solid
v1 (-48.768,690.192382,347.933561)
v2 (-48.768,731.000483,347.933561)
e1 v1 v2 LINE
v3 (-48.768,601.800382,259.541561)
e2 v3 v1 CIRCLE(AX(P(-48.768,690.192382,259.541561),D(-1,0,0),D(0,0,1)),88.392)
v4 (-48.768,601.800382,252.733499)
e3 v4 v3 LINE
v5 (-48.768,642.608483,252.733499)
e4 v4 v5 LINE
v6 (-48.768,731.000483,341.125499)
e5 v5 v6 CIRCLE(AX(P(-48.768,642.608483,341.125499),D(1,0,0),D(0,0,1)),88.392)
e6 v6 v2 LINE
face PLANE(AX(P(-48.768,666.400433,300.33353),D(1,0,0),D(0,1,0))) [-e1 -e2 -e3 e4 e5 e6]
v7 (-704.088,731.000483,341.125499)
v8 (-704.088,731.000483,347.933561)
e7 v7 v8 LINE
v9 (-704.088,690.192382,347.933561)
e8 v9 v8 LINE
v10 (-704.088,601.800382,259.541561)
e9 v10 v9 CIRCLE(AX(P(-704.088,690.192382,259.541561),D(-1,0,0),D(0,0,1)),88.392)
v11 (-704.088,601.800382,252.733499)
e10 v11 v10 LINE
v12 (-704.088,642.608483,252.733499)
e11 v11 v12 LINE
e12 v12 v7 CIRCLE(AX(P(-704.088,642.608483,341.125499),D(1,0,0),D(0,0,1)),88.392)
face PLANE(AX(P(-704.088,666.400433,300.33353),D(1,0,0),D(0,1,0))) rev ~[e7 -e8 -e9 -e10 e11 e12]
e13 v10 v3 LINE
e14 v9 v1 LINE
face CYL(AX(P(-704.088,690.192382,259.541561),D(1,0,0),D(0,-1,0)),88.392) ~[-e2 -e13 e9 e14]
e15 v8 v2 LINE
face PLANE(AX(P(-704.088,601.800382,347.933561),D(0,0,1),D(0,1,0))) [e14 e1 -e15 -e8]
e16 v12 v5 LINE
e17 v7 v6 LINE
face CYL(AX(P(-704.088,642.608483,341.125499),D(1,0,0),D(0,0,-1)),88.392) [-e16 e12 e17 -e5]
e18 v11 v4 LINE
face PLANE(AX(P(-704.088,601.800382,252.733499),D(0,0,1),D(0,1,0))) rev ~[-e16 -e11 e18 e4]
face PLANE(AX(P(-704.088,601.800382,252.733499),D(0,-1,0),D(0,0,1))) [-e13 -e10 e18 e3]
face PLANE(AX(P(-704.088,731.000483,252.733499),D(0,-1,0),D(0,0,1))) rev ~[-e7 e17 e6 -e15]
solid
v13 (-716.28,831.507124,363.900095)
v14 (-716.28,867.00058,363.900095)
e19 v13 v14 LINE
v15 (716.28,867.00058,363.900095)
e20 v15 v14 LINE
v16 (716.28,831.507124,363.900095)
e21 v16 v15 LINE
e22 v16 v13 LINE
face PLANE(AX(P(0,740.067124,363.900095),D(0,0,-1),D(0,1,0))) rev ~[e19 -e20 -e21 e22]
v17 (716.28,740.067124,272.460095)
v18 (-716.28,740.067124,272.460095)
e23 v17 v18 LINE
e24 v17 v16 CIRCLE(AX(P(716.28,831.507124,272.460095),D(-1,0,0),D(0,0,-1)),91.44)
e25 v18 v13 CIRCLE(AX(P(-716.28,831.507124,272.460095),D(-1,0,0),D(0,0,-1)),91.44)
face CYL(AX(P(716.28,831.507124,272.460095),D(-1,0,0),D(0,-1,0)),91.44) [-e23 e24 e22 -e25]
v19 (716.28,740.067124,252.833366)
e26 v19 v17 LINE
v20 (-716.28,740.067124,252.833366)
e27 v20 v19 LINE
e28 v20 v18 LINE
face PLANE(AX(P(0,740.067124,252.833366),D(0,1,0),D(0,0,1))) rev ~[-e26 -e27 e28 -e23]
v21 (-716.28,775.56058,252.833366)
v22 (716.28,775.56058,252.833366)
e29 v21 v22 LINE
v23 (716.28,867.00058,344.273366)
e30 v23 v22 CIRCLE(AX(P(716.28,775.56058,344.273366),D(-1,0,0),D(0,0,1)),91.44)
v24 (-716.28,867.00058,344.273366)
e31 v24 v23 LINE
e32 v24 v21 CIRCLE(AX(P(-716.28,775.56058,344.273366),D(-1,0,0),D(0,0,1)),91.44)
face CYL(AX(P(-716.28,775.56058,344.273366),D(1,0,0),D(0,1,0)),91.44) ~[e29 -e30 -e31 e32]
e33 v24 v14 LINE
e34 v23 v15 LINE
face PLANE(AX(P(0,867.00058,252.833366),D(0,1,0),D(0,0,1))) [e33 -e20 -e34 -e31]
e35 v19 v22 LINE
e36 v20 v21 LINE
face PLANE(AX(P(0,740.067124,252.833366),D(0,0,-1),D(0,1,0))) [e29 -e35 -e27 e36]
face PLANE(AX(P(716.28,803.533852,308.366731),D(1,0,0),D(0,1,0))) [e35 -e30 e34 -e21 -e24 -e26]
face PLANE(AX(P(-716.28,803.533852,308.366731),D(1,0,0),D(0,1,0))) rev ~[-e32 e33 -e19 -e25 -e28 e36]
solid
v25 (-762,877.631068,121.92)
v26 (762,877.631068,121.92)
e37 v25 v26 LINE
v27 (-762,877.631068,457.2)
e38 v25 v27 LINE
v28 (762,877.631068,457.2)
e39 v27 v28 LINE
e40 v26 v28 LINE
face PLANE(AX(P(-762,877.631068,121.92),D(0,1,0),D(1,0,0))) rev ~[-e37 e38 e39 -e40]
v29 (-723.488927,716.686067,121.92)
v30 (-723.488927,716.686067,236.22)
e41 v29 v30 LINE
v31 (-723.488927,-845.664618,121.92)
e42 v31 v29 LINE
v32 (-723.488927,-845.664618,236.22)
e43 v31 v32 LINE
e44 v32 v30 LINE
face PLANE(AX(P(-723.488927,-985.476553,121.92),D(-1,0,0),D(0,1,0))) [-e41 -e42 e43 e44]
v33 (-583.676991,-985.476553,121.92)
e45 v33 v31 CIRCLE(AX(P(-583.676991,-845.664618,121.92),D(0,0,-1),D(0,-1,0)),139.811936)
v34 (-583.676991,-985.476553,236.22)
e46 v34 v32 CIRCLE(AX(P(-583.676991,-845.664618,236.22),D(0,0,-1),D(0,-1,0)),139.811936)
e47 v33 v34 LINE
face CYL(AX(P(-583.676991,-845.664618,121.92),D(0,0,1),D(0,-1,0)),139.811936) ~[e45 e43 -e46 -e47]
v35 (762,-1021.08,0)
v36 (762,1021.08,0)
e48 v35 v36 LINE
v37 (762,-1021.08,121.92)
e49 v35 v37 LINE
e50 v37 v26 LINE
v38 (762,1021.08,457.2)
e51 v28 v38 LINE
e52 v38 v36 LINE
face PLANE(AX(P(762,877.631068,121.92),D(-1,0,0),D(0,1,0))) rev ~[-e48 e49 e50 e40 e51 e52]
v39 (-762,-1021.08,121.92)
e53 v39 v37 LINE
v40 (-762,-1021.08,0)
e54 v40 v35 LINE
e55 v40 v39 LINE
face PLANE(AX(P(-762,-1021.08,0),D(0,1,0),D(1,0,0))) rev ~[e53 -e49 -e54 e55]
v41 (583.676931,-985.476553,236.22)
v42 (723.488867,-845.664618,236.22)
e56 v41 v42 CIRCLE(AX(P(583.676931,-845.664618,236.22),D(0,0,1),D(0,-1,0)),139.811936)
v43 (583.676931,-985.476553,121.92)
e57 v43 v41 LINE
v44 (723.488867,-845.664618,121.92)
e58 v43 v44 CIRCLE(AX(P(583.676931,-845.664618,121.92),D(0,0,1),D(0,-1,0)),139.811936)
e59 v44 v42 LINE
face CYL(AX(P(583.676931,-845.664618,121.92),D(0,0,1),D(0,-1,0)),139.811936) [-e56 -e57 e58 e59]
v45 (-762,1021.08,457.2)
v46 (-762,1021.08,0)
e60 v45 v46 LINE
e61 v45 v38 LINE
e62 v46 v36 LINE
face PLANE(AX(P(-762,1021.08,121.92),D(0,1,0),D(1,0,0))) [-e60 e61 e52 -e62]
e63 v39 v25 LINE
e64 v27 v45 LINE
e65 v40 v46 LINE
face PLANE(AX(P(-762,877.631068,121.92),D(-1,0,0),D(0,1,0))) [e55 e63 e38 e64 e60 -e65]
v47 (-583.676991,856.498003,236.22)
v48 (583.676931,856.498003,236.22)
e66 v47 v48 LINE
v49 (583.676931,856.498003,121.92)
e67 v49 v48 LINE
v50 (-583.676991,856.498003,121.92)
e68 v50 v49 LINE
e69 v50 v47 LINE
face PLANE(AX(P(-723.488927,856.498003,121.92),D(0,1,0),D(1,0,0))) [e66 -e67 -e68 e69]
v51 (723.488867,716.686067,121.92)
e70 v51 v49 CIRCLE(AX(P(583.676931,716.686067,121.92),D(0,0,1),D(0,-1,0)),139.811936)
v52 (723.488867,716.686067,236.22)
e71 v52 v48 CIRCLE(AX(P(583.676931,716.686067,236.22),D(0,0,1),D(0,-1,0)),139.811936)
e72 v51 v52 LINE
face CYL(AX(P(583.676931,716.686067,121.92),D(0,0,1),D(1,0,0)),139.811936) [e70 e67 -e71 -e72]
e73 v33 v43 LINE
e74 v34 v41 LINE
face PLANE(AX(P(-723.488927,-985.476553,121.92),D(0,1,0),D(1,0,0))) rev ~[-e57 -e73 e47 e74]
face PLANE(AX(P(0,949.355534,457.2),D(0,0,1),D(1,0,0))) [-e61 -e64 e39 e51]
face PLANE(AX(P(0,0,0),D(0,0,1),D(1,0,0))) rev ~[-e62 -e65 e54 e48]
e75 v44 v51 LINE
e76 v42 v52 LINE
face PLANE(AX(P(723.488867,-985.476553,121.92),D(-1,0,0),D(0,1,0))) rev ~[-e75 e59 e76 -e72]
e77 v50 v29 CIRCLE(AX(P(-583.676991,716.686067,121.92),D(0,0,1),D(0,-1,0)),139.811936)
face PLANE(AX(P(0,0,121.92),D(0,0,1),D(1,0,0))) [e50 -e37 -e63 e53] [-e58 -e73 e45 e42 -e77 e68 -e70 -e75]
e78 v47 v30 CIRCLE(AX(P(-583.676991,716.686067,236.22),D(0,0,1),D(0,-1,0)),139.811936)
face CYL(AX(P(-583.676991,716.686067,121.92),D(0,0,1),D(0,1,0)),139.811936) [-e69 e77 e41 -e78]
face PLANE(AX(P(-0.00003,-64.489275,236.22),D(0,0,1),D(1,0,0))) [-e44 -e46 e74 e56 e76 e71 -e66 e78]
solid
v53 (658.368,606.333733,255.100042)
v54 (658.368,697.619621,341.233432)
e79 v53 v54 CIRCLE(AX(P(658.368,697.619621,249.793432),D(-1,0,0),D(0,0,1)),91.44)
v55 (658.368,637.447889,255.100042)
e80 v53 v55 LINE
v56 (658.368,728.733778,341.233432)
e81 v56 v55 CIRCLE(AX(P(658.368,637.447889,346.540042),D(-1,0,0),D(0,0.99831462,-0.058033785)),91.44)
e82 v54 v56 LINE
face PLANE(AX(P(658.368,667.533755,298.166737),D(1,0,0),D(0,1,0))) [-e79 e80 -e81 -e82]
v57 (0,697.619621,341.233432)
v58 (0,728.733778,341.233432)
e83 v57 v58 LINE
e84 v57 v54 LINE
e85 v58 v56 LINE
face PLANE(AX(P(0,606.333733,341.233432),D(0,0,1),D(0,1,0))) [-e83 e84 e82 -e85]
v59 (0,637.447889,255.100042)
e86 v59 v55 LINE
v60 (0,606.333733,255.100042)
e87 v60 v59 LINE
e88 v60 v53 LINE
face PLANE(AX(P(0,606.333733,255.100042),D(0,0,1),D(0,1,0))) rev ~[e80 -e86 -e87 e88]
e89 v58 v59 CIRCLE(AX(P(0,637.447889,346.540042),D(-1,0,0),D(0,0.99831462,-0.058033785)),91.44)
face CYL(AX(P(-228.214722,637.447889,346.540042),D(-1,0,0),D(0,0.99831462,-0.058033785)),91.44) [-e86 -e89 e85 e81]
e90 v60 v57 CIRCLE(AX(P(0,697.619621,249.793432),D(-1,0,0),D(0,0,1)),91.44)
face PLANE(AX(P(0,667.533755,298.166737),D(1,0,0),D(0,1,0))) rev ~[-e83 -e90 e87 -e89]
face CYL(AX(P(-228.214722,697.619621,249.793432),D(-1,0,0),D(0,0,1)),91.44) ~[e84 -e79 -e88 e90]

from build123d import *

# Parameters (mm, degrees)
F0_W         = 1524
F0_H         = 2042.16
F1_DEPTH     = 121.92
F2_W         = 1446.9777941704
F2_H         = 1841.9745564461
F3_DEPTH     = 114.3
F4_R         = 139.8119358242
F5_W         = 1524
F5_H         = 143.4489317703
F6_DEPTH     = 335.28
F7_W         = 126.9334554672
F7_H         = 111.0667288303
F8_DEPTH     = 716.28
F9_R         = 91.44
F10_W        = 122.4000453949
F10_H        = 86.1333906651
F11_DEPTH    = 658.368
F12_T1_DEPTH = 1114.797444092
F14_W        = 129.2001008987
F14_H        = 95.2000617981
F15_DEPTH    = 655.32
F16_R        = 88.392


# Not quite as in the source:
# - a fillet or chamfer that OpenCascade refuses, or shapes differently, is made with other operations: its cross-section is extruded or revolved along the edge and cut away or added


with BuildPart() as f1:
    # F0 (on Top) → F1 (new body)
    with BuildSketch(Plane.XY):
        Rectangle(F0_W, F0_H)
    extrude(amount=F1_DEPTH)

    # F2 (on face) → F3 (join)
    with BuildSketch(Plane.XY.offset(121.92)):
        with Locations((-2.98023e-05, -64.4892752171)):
            Rectangle(F2_W, F2_H)
    extrude(amount=F3_DEPTH)

    # F4
    f4_edges = [f1.edges().sort_by_distance(p)[0] for p in [
        (-723.488927, 856.498003, 179.07),
        (723.488867, 856.498003, 179.07),
        (723.488867, -985.476553, 179.07),
        (-723.488927, -985.476553, 179.07),
    ]]
    fillet(f4_edges, radius=F4_R)

    # F5 (on face) → F6 (join)
    with BuildSketch(Plane.XY.offset(121.92)):
        with Locations((0, 949.3555341148)):
            Rectangle(F5_W, F5_H)
    extrude(amount=F6_DEPTH)


with BuildPart() as f8:
    # F7 (on Right) → F8 (new body, symmetric)
    with BuildSketch(Plane.YZ):
        with Locations((803.5338521004, 308.3667308092)):
            Rectangle(F7_W, F7_H)
    extrude(amount=F8_DEPTH, both=True)

    # F9
    f9_edges = [f8.edges().sort_by_distance(p)[0] for p in [
        (0, 740.067124, 363.900095),
        (0, 867.00058, 252.833366),
    ]]
    fillet(f9_edges, radius=F9_R)


with BuildPart() as f11:
    # F10 (on Right) → F11 (new body)
    with BuildSketch(Plane.YZ):
        with Locations((667.5337553024, 298.1667369604)):
            Rectangle(F10_W, F10_H)
    extrude(amount=F11_DEPTH)

    # F12: fillet of radius 91.44 on 2 edges, made by hand

    # F12_s2 → F12_t1 (cut)
    with BuildSketch(Plane.YZ.offset(-228.214722046)):
        with BuildLine():
            ThreePointArc((697.6196214234, 341.2334322929), (634.8659870967, 316.3009880952), (606.333732605, 255.1000416279))
            Line((606.333732605, 255.1000416279), (606.333732605, 341.2334322929))
            Line((606.333732605, 341.2334322929), (697.6196214234, 341.2334322929))
        make_face()
        with BuildLine():
            ThreePointArc((728.7337779999, 341.2334322929), (700.2015235081, 280.0324858256), (637.4478891815, 255.1000416279))
            Line((637.4478891815, 255.1000416279), (728.7337779999, 255.1000416279))
            Line((728.7337779999, 255.1000416279), (728.7337779999, 341.2334322929))
        make_face()
    extrude(amount=F12_T1_DEPTH, mode=Mode.SUBTRACT)


with BuildPart() as f15:
    # F14 (on offset) → F15 (new body)
    with BuildSketch(Plane.YZ.offset(-704.088)):
        with Locations((666.4004325867, 300.3335297108)):
            Rectangle(F14_W, F14_H)
    extrude(amount=F15_DEPTH)

    # F16
    f16_edges = [f15.edges().sort_by_distance(p)[0] for p in [
        (-376.428, 601.800382, 347.933561),
        (-376.428, 731.000483, 252.733499),
    ]]
    fillet(f16_edges, radius=F16_R)


solid = Compound([f1.part, f8.part, f11.part, f15.part])
